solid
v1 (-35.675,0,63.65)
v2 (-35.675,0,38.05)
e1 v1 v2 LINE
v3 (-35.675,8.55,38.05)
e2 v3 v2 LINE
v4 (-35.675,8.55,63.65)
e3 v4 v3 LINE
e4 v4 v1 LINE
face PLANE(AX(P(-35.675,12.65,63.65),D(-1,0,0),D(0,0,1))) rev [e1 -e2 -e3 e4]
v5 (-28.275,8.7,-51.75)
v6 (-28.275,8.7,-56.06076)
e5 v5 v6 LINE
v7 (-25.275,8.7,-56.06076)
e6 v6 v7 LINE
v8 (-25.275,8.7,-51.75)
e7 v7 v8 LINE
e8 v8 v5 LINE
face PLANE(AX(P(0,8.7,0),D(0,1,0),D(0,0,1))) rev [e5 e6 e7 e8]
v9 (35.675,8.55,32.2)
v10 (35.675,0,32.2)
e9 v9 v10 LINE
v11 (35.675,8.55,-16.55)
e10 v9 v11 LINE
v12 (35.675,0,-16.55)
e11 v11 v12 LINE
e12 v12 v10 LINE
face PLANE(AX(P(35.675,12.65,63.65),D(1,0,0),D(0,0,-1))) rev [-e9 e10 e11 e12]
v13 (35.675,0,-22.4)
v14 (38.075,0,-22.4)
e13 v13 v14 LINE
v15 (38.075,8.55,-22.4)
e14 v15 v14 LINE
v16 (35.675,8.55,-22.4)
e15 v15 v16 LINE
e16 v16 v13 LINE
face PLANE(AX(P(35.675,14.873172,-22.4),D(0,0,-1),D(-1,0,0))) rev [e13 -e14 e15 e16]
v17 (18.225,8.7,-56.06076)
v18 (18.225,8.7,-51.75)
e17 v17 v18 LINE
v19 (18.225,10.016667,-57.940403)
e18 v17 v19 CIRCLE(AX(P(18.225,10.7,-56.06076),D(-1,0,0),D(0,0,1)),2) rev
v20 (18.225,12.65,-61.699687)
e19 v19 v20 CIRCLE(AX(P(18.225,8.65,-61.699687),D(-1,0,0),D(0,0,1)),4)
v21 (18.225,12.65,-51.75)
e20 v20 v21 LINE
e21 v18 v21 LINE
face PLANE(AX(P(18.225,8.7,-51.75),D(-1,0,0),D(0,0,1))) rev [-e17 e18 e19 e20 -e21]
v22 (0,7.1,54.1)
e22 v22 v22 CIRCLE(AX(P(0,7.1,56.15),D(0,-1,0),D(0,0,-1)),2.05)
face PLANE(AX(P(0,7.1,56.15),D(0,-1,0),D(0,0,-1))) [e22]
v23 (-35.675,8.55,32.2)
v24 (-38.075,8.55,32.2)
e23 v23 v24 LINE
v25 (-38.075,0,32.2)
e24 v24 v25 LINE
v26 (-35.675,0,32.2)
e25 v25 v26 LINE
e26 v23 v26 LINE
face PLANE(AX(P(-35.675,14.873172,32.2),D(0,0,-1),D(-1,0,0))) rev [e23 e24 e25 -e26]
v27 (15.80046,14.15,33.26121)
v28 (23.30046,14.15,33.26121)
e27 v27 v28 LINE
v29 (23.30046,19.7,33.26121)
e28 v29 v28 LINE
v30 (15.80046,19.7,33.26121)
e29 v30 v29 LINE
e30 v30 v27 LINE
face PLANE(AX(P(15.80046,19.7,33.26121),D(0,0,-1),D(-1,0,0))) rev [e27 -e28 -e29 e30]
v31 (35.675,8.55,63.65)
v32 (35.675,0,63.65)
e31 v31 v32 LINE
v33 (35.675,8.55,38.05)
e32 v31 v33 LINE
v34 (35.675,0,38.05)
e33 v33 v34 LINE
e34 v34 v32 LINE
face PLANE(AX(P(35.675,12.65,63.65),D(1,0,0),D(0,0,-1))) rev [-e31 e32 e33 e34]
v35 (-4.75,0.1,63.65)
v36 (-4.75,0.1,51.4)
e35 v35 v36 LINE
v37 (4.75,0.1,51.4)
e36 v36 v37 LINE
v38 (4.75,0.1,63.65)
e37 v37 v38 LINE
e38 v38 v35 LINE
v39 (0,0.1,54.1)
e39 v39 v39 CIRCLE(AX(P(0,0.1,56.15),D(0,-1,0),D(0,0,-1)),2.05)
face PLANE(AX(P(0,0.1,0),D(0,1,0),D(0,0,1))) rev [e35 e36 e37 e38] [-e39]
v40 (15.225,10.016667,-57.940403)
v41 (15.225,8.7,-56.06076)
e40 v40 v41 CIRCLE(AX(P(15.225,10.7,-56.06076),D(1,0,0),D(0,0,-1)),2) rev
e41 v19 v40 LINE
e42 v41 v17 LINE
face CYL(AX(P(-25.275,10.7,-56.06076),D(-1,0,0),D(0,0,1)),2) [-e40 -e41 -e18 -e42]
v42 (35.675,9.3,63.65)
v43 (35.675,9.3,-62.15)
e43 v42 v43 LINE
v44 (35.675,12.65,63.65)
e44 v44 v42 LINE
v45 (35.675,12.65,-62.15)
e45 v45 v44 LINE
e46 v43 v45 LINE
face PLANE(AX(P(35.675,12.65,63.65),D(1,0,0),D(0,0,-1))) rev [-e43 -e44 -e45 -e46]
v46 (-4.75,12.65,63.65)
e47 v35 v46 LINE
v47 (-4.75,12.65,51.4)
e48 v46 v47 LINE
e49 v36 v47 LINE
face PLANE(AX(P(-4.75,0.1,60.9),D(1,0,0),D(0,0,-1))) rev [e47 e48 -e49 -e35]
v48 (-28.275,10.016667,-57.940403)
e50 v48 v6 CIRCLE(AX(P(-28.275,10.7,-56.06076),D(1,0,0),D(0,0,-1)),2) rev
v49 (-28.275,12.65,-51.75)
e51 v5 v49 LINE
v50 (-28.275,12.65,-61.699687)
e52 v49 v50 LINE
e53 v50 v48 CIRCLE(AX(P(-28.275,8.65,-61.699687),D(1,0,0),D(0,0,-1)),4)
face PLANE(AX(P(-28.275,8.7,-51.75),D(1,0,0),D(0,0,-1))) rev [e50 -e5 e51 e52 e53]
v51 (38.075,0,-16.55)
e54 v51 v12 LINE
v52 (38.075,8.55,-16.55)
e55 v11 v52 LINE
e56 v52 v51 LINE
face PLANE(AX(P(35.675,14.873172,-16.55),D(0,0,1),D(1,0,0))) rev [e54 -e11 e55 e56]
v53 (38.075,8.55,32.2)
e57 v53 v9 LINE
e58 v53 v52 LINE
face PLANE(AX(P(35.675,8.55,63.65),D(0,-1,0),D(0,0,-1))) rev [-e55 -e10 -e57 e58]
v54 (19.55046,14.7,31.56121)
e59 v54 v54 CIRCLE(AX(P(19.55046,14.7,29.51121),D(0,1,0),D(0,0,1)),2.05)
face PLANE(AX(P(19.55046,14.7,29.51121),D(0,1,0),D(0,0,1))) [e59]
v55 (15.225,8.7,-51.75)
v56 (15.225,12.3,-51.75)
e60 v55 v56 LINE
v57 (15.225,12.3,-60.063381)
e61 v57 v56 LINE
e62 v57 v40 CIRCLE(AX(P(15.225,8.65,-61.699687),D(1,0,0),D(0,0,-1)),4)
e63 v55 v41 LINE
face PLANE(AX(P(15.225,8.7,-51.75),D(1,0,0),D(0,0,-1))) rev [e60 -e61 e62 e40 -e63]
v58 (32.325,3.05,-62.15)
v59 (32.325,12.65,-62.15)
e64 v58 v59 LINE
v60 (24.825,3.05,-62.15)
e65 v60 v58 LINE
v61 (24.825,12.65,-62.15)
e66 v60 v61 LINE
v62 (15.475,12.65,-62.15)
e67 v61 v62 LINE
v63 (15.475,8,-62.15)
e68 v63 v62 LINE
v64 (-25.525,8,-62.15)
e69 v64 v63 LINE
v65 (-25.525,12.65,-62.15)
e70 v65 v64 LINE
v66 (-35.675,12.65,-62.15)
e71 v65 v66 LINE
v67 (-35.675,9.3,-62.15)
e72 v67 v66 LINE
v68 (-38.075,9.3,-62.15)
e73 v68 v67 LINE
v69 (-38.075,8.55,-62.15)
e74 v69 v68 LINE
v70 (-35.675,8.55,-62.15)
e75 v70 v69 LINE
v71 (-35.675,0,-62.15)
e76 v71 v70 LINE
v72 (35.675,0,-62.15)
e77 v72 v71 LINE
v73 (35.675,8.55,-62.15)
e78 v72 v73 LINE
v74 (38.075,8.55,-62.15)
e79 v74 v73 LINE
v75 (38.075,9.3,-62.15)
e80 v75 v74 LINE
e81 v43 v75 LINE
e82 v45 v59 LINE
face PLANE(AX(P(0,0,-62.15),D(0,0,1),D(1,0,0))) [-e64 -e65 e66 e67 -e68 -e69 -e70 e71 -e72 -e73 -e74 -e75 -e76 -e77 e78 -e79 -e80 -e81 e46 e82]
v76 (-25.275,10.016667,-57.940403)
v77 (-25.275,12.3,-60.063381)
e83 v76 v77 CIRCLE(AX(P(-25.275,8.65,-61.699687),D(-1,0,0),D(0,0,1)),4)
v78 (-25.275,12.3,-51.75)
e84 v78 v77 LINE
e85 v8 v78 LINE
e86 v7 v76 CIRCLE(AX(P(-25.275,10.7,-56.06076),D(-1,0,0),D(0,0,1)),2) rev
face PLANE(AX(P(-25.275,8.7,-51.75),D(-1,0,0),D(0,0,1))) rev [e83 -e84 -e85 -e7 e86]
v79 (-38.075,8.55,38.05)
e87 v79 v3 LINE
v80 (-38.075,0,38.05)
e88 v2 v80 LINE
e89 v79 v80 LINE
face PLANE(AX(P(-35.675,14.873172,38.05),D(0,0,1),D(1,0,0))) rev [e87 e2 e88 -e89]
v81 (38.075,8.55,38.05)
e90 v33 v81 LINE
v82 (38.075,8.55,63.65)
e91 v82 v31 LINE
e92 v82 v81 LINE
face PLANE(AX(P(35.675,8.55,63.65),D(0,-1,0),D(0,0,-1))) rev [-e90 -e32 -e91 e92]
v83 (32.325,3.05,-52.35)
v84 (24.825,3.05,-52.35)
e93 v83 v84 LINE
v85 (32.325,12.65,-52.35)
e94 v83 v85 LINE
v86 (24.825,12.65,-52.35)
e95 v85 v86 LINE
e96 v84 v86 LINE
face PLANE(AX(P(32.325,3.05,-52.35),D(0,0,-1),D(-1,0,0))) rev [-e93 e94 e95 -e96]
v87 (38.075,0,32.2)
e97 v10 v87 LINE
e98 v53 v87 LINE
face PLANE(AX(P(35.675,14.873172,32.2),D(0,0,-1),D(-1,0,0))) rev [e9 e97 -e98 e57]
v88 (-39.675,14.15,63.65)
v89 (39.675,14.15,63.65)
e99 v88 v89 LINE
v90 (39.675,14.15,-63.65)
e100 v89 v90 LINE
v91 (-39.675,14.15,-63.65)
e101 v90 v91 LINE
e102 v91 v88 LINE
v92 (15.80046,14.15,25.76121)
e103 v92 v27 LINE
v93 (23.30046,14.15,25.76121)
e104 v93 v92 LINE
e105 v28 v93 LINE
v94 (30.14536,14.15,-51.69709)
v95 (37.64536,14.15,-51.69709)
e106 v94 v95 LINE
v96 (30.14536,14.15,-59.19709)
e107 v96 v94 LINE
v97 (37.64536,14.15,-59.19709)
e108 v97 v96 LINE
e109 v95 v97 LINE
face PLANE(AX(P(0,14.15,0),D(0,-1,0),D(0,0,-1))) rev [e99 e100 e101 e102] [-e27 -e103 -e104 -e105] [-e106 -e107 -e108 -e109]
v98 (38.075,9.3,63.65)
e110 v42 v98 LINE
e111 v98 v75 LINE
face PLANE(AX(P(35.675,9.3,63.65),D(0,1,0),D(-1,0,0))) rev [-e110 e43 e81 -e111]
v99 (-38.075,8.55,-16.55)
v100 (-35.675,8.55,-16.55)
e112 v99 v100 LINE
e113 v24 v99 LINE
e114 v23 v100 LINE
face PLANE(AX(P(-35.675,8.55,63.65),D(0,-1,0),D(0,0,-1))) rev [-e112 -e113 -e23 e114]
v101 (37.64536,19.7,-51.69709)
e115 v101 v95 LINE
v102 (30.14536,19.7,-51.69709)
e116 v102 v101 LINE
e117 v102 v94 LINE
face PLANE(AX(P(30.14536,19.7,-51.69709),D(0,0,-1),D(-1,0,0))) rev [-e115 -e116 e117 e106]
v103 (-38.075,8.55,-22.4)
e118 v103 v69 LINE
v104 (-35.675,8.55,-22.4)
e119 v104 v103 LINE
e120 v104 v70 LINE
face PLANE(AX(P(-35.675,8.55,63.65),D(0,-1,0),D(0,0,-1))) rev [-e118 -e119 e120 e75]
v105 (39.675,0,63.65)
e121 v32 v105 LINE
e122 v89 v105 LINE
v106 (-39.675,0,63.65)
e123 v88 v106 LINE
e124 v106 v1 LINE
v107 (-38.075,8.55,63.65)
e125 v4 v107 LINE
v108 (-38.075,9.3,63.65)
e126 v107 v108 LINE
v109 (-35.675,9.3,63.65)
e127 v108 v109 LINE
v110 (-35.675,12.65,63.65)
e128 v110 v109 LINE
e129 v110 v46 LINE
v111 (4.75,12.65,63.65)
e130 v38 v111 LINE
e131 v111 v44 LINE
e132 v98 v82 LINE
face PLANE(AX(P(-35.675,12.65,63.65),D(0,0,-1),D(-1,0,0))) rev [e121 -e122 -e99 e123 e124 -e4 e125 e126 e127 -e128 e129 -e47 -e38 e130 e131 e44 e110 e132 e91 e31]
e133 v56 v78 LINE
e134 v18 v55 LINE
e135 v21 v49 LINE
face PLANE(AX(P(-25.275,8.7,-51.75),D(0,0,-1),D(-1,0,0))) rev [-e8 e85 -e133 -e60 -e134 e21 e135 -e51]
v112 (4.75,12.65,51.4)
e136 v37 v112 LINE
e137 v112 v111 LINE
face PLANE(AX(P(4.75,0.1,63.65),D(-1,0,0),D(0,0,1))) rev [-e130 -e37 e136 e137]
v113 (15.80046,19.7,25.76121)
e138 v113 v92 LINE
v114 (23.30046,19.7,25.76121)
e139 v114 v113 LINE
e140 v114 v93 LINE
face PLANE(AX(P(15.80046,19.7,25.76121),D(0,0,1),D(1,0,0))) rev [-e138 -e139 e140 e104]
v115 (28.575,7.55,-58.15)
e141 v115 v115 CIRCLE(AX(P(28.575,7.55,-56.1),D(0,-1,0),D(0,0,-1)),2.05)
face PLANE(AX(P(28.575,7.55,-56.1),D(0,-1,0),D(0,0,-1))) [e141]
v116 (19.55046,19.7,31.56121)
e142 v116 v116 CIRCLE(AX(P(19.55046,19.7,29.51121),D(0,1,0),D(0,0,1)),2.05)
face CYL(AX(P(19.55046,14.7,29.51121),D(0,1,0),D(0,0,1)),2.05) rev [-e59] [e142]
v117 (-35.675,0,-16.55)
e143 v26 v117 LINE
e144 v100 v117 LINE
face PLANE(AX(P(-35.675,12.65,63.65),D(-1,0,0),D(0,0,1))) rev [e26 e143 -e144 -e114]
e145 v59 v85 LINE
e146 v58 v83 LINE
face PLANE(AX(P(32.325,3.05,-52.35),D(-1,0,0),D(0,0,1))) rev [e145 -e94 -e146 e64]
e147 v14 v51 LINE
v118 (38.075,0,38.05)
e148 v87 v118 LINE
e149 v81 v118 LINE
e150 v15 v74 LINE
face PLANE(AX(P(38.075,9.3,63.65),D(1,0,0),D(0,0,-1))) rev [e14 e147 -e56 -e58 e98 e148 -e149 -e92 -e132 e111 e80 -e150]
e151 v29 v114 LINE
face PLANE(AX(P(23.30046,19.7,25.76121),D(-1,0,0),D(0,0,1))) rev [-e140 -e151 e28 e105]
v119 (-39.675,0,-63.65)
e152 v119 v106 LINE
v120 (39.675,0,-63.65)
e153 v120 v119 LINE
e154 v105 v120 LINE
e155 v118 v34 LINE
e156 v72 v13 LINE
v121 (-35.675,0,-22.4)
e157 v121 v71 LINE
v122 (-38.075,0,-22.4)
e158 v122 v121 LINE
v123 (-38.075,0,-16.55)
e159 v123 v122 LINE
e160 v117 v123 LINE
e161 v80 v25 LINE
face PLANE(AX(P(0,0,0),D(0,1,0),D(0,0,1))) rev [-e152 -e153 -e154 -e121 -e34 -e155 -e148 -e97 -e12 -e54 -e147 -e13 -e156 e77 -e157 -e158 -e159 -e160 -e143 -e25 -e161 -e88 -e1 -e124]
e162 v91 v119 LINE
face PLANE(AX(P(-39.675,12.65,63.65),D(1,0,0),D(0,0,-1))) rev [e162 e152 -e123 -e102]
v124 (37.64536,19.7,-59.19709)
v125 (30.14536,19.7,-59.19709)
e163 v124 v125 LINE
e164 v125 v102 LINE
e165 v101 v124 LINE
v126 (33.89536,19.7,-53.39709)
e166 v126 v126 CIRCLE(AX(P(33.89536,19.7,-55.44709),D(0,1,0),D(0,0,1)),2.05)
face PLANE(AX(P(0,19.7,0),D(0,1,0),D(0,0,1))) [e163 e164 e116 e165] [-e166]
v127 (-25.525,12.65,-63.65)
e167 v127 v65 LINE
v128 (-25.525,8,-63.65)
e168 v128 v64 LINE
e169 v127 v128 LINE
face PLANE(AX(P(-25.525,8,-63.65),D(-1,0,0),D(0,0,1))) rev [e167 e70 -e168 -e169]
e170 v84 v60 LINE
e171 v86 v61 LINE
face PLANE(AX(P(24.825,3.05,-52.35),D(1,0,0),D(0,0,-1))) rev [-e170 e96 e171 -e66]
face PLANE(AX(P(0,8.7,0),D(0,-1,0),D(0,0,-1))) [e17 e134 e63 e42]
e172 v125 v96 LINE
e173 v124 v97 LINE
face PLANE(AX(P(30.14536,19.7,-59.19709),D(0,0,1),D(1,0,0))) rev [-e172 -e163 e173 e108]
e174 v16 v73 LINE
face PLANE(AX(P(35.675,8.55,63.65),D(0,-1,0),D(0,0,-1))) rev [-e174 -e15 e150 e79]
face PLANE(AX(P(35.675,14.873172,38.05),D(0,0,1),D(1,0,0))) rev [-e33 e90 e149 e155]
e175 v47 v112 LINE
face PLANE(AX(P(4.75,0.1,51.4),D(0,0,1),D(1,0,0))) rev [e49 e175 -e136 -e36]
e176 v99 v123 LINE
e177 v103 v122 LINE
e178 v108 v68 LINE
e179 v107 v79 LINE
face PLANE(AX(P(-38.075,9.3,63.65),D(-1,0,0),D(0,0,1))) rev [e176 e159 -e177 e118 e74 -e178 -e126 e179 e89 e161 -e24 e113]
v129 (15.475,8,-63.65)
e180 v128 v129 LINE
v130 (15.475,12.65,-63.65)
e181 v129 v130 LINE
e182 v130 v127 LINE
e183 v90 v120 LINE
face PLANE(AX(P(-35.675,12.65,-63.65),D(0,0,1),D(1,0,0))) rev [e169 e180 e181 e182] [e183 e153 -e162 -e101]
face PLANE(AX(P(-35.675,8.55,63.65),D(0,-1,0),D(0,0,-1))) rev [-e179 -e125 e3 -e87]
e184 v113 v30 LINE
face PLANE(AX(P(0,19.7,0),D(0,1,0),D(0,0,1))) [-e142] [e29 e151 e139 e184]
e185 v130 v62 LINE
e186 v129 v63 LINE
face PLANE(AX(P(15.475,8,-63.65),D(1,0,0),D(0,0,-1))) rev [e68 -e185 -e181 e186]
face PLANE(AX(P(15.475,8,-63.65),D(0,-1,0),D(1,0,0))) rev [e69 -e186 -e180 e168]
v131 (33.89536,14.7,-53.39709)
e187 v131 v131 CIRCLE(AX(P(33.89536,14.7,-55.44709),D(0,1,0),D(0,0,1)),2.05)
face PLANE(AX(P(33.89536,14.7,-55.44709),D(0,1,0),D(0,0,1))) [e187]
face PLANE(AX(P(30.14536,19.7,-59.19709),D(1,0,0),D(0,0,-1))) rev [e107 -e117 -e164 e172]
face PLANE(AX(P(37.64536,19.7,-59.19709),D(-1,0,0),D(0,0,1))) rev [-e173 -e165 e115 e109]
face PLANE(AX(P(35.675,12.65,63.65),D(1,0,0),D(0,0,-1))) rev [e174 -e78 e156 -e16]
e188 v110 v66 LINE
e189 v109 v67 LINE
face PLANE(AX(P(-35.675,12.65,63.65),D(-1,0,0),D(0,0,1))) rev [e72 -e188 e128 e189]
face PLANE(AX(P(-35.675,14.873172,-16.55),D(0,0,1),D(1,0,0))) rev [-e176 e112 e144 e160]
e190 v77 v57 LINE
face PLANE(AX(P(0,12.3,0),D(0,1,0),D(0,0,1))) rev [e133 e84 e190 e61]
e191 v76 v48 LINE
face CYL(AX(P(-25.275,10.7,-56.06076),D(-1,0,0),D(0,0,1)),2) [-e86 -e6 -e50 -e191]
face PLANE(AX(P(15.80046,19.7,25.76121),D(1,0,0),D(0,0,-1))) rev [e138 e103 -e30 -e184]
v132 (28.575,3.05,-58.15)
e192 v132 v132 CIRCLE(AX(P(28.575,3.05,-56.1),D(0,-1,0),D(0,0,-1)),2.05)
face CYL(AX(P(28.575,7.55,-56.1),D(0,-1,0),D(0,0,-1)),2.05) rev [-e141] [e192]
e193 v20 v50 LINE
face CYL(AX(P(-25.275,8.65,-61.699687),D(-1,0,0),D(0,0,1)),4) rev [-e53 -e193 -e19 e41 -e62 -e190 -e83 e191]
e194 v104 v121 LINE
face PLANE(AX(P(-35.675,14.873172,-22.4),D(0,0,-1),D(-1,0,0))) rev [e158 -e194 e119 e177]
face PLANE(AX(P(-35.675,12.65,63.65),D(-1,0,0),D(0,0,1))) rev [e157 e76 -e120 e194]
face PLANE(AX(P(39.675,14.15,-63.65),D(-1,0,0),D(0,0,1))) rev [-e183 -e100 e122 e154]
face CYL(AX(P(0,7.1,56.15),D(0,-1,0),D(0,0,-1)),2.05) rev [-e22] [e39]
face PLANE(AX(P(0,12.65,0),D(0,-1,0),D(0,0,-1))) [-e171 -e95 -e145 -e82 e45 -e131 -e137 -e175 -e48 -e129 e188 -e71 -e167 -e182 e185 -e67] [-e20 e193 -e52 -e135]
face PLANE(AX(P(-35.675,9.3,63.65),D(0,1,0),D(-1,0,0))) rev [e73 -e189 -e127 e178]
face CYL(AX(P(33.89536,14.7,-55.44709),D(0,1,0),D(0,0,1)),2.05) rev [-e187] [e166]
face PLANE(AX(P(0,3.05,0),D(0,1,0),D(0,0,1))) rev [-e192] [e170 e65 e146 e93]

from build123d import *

# Parameters (mm, degrees)
SKETCH_1_W          = 4
SKETCH_1_H          = 127.3
EXTRUDE_1_DEPTH     = 12.65
EXTRUDE_1_2_DEPTH   = 12.65
SKETCH_2_W          = 79.35
SKETCH_2_H          = 127.3
EXTRUDE_2_DEPTH     = 1.5
CUT_EXTRUDE_START   = -1.5
SKETCH_3_W          = 2.4
SKETCH_3_H          = 0.75
CUT_EXTRUDE_1_DEPTH = 133.588098372
SKETCH_4_W          = 71.35
SKETCH_4_H          = 1.5
EXTRUDE_3_DEPTH     = 12.65
SKETCH_6_W          = 7.5
SKETCH_6_H          = 9.8
EXTRUDE_5_DEPTH     = 9.6
SKETCH_7_R          = 2.05
CUT_EXTRUDE_2_DEPTH = 4.5
SKETCH_8_W          = 2.4
SKETCH_8_H          = 5.85
CUT_EXTRUDE_3_DEPTH = 8.55
SKETCH_10_W         = 3
SKETCH_10_H         = 5.95
EXTRUDE_6_DEPTH     = 3.95
SKETCH_11_W         = 40.5
SKETCH_11_H         = 5.95
EXTRUDE_7_DEPTH     = 0.35
FILLET_4_R          = 4
FILLET_5_R          = 2
SKETCH_12_W         = 41
SKETCH_12_H         = 4.65
CUT_EXTRUDE_4_DEPTH = 133.664871481
EXTRUDE_8_DEPTH     = 12.55
SKETCH_14_R         = 2.05
CUT_EXTRUDE_5_DEPTH = 7
SKETCH_15_W         = 7.5
SKETCH_15_H         = 7.5
EXTRUDE_9_DEPTH     = 5.55
SKETCH_16_R         = 2.05
CUT_EXTRUDE_6_DEPTH = 5


with BuildPart() as part:
    # Эскиз1 → Бобышка-Вытянуть1 (new body)
    with BuildSketch(Plane(origin=(0, 0, 0), x_dir=(1, 0, 0), z_dir=(0, 1, 0))):
        with Locations((37.675, 0)):
            Rectangle(SKETCH_1_W, SKETCH_1_H)
    extrude(amount=EXTRUDE_1_DEPTH)



with BuildPart() as body_2:
    # Эскиз1 → Extrude 1 2 (new body)
    with BuildSketch(Plane(origin=(0, 0, 0), x_dir=(1, 0, 0), z_dir=(0, 1, 0))):
        with Locations((-37.675, 0)):
            Rectangle(SKETCH_1_W, SKETCH_1_H)
    extrude(amount=EXTRUDE_1_2_DEPTH)


with BuildPart() as part_1:
    add(part.part)

    add(body_2.part)  # Бобышка-Вытянуть2 merges body 2
    # Эскиз2 → Бобышка-Вытянуть2 (add)
    with BuildSketch(Plane(origin=(0, 12.65, 0), x_dir=(1, 0, 0), z_dir=(0, 1, 0))):
        Rectangle(SKETCH_2_W, SKETCH_2_H)
    extrude(amount=EXTRUDE_2_DEPTH)

    # Эскиз3 → Вырез-Вытянуть1 (cut, through all)
    with BuildSketch(Plane(origin=(0, 0, -63.65), x_dir=(-1, 0, 0), z_dir=(0, 0, -1)).offset(CUT_EXTRUDE_START)):
        with Locations((-36.875, 8.925)):
            Rectangle(SKETCH_3_W, SKETCH_3_H)
        with Locations((36.875, 8.925)):
            Rectangle(SKETCH_3_W, SKETCH_3_H)
    extrude(amount=-CUT_EXTRUDE_1_DEPTH, mode=Mode.SUBTRACT)

    # Эскиз4 → Бобышка-Вытянуть3 (add)
    with BuildSketch(Plane.XZ.offset(-12.65)):
        with Locations((0, -62.9)):
            Rectangle(SKETCH_4_W, SKETCH_4_H)
    extrude(amount=EXTRUDE_3_DEPTH)

    # Эскиз6 → Бобышка-Вытянуть5 (add)
    with BuildSketch(Plane.XZ.offset(-12.65)):
        with Locations((28.575, -57.25)):
            Rectangle(SKETCH_6_W, SKETCH_6_H)
    extrude(amount=EXTRUDE_5_DEPTH)

    # Эскиз7 → Вырез-Вытянуть2 (cut)
    with BuildSketch(Plane.XZ.offset(-3.05)):
        with Locations(Location((28.575, -56.1, 0), (0, 0, 270))):
            Circle(SKETCH_7_R)
    extrude(amount=-CUT_EXTRUDE_2_DEPTH, mode=Mode.SUBTRACT)

    # Эскиз8 → Вырез-Вытянуть3 (cut)
    with BuildSketch(Plane.XZ):
        with Locations((-36.875, 35.125)):
            Rectangle(SKETCH_8_W, SKETCH_8_H)
        with Locations((-36.875, -19.475)):
            Rectangle(SKETCH_8_W, SKETCH_8_H)
        with Locations((36.875, -19.475)):
            Rectangle(SKETCH_8_W, SKETCH_8_H)
        with Locations((36.875, 35.125)):
            Rectangle(SKETCH_8_W, SKETCH_8_H)
    extrude(amount=-CUT_EXTRUDE_3_DEPTH, mode=Mode.SUBTRACT)

    # Эскиз10 → Бобышка-Вытянуть6 (add)
    with BuildSketch(Plane.XZ.offset(-12.65)):
        with Locations((-26.775, -54.725)):
            Rectangle(SKETCH_10_W, SKETCH_10_H)
        with Locations((16.725, -54.725)):
            Rectangle(SKETCH_10_W, SKETCH_10_H)
    extrude(amount=EXTRUDE_6_DEPTH)

    # Эскиз11 → Бобышка-Вытянуть7 (add)
    with BuildSketch(Plane.XZ.offset(-12.65)):
        with Locations((-5.025, -54.725)):
            Rectangle(SKETCH_11_W, SKETCH_11_H)
    extrude(amount=EXTRUDE_7_DEPTH)

    # Скругление4
    # the kernel refuses this fillet: 4 mm, written as the material it adds along each edge
    with BuildSketch(Plane(origin=(18.225, 12.65, -57.7), x_dir=(0, 0, -1), z_dir=(-1, 0, 0))) as fillet_4_piece_1_section:
        with BuildLine():
            CenterArc((FILLET_4_R, FILLET_4_R), FILLET_4_R, 180, 90)
            Line((0, FILLET_4_R), (0, 0))
            Line((0, 0), (FILLET_4_R, 0))
        make_face()
    fillet_4_piece_1 = extrude(amount=46.5, mode=Mode.PRIVATE)
    fillet_4_piece_1 = split(fillet_4_piece_1, bisect_by=Plane(origin=(15.225, 12.535953676, -59.259664423), z_dir=(1, 0, 0)), keep=Keep.TOP, mode=Mode.PRIVATE)
    fillet_4_piece_1 = split(fillet_4_piece_1, bisect_by=Plane(origin=(16.725, 12.3, -59.259664423), z_dir=(0, 1, 0)), keep=Keep.TOP, mode=Mode.PRIVATE)
    add(fillet_4_piece_1)
    with BuildSketch(Plane(origin=(18.225, 12.65, -57.7), x_dir=(0, 0, -1), z_dir=(-1, 0, 0))) as fillet_4_piece_2_section:
        with BuildLine():
            CenterArc((FILLET_4_R, FILLET_4_R), FILLET_4_R, 180, 90)
            Line((0, FILLET_4_R), (0, 0))
            Line((0, 0), (FILLET_4_R, 0))
        make_face()
    fillet_4_piece_2 = extrude(amount=46.5, mode=Mode.PRIVATE)
    fillet_4_piece_2 = split(fillet_4_piece_2, bisect_by=Plane(origin=(16.725, 8.7, -58.276150153), z_dir=(0, 1, 0)), keep=Keep.TOP, mode=Mode.PRIVATE)
    fillet_4_piece_2 = split(fillet_4_piece_2, bisect_by=Plane(origin=(15.225, 11.348610823, -58.276150153), z_dir=(1, 0, 0)), keep=Keep.TOP, mode=Mode.PRIVATE)
    fillet_4_piece_2 = split(fillet_4_piece_2, bisect_by=Plane(origin=(16.725, 12.3, -58.276150153), z_dir=(0, -1, 0)), keep=Keep.TOP, mode=Mode.PRIVATE)
    add(fillet_4_piece_2)
    with BuildSketch(Plane(origin=(18.225, 12.65, -57.7), x_dir=(0, 0, -1), z_dir=(-1, 0, 0))) as fillet_4_piece_3_section:
        with BuildLine():
            CenterArc((FILLET_4_R, FILLET_4_R), FILLET_4_R, 180, 90)
            Line((0, FILLET_4_R), (0, 0))
            Line((0, 0), (FILLET_4_R, 0))
        make_face()
    fillet_4_piece_3 = extrude(amount=46.5, mode=Mode.PRIVATE)
    fillet_4_piece_3 = split(fillet_4_piece_3, bisect_by=Plane(origin=(15.225, 12.535953676, -59.259664423), z_dir=(-1, 0, 0)), keep=Keep.TOP, mode=Mode.PRIVATE)
    fillet_4_piece_3 = split(fillet_4_piece_3, bisect_by=Plane(origin=(-5.025, 12.3, -59.259664423), z_dir=(0, 1, 0)), keep=Keep.TOP, mode=Mode.PRIVATE)
    fillet_4_piece_3 = split(fillet_4_piece_3, bisect_by=Plane(origin=(-25.275, 12.535953676, -59.259664423), z_dir=(1, 0, 0)), keep=Keep.TOP, mode=Mode.PRIVATE)
    add(fillet_4_piece_3)
    with BuildSketch(Plane(origin=(18.225, 12.65, -57.7), x_dir=(0, 0, -1), z_dir=(-1, 0, 0))) as fillet_4_piece_4_section:
        with BuildLine():
            CenterArc((FILLET_4_R, FILLET_4_R), FILLET_4_R, 180, 90)
            Line((0, FILLET_4_R), (0, 0))
            Line((0, 0), (FILLET_4_R, 0))
        make_face()
    fillet_4_piece_4 = extrude(amount=46.5, mode=Mode.PRIVATE)
    fillet_4_piece_4 = split(fillet_4_piece_4, bisect_by=Plane(origin=(-26.775, 12.3, -59.259664423), z_dir=(0, 1, 0)), keep=Keep.TOP, mode=Mode.PRIVATE)
    fillet_4_piece_4 = split(fillet_4_piece_4, bisect_by=Plane(origin=(-25.275, 12.535953676, -59.259664423), z_dir=(-1, 0, 0)), keep=Keep.TOP, mode=Mode.PRIVATE)
    add(fillet_4_piece_4)
    with BuildSketch(Plane(origin=(18.225, 12.65, -57.7), x_dir=(0, 0, -1), z_dir=(-1, 0, 0))) as fillet_4_piece_5_section:
        with BuildLine():
            CenterArc((FILLET_4_R, FILLET_4_R), FILLET_4_R, 180, 90)
            Line((0, FILLET_4_R), (0, 0))
            Line((0, 0), (FILLET_4_R, 0))
        make_face()
    fillet_4_piece_5 = extrude(amount=46.5, mode=Mode.PRIVATE)
    fillet_4_piece_5 = split(fillet_4_piece_5, bisect_by=Plane(origin=(-26.775, 8.7, -58.276150153), z_dir=(0, 1, 0)), keep=Keep.TOP, mode=Mode.PRIVATE)
    fillet_4_piece_5 = split(fillet_4_piece_5, bisect_by=Plane(origin=(-26.775, 12.3, -58.276150153), z_dir=(0, -1, 0)), keep=Keep.TOP, mode=Mode.PRIVATE)
    fillet_4_piece_5 = split(fillet_4_piece_5, bisect_by=Plane(origin=(-25.275, 11.348610823, -58.276150153), z_dir=(-1, 0, 0)), keep=Keep.TOP, mode=Mode.PRIVATE)
    add(fillet_4_piece_5)

    # Скругление5
    fillet_5_edges = [part_1.edges().sort_by_distance(p)[0] for p in [
        (-26.775, 8.7, -57.700312512),
        (16.725, 8.7, -57.700312512),
    ]]
    fillet(fillet_5_edges, radius=FILLET_5_R)

    # Эскиз12 → Вырез-Вытянуть4 (cut, through all)
    with BuildSketch(Plane.XY.offset(-62.15)):
        with Locations((-5.025, 10.325)):
            Rectangle(SKETCH_12_W, SKETCH_12_H)
    extrude(amount=-CUT_EXTRUDE_4_DEPTH, mode=Mode.SUBTRACT)

    # Эскиз13 → Бобышка-Вытянуть8 (add)
    with BuildSketch(Plane.XZ.offset(-12.65)):
        Polygon((-4.75, 60.9), (-4.75, 63.65), (4.75, 63.65), (4.75, 60.9), (4.75, 51.4), (-4.75, 51.4), align=None)
    extrude(amount=EXTRUDE_8_DEPTH)

    # Эскиз14 → Вырез-Вытянуть5 (cut)
    with BuildSketch(Plane.XZ.offset(-0.1)):
        with Locations(Location((0, 56.15, 0), (0, 0, 270))):
            Circle(SKETCH_14_R)
    extrude(amount=-CUT_EXTRUDE_5_DEPTH, mode=Mode.SUBTRACT)

    # Эскиз15 → Бобышка-Вытянуть9 (add)
    with BuildSketch(Plane(origin=(0, 14.15, 0), x_dir=(1, 0, 0), z_dir=(0, 1, 0))):
        with Locations((33.89536, 55.44709)):
            Rectangle(SKETCH_15_W, SKETCH_15_H)
        with Locations((19.55046, -29.51121)):
            Rectangle(SKETCH_15_W, SKETCH_15_H)
    extrude(amount=EXTRUDE_9_DEPTH)

    # Эскиз16 → Вырез-Вытянуть6 (cut)
    with BuildSketch(Plane(origin=(0, 19.7, 0), x_dir=(1, 0, 0), z_dir=(0, 1, 0))):
        with Locations(Location((19.55046, -29.51121, 0), (0, 0, 270))):
            Circle(SKETCH_16_R)
        with Locations(Location((33.89536, 55.44709, 0), (0, 0, 270))):
            Circle(SKETCH_16_R)
    extrude(amount=-CUT_EXTRUDE_6_DEPTH, mode=Mode.SUBTRACT)


solid = part_1.part
